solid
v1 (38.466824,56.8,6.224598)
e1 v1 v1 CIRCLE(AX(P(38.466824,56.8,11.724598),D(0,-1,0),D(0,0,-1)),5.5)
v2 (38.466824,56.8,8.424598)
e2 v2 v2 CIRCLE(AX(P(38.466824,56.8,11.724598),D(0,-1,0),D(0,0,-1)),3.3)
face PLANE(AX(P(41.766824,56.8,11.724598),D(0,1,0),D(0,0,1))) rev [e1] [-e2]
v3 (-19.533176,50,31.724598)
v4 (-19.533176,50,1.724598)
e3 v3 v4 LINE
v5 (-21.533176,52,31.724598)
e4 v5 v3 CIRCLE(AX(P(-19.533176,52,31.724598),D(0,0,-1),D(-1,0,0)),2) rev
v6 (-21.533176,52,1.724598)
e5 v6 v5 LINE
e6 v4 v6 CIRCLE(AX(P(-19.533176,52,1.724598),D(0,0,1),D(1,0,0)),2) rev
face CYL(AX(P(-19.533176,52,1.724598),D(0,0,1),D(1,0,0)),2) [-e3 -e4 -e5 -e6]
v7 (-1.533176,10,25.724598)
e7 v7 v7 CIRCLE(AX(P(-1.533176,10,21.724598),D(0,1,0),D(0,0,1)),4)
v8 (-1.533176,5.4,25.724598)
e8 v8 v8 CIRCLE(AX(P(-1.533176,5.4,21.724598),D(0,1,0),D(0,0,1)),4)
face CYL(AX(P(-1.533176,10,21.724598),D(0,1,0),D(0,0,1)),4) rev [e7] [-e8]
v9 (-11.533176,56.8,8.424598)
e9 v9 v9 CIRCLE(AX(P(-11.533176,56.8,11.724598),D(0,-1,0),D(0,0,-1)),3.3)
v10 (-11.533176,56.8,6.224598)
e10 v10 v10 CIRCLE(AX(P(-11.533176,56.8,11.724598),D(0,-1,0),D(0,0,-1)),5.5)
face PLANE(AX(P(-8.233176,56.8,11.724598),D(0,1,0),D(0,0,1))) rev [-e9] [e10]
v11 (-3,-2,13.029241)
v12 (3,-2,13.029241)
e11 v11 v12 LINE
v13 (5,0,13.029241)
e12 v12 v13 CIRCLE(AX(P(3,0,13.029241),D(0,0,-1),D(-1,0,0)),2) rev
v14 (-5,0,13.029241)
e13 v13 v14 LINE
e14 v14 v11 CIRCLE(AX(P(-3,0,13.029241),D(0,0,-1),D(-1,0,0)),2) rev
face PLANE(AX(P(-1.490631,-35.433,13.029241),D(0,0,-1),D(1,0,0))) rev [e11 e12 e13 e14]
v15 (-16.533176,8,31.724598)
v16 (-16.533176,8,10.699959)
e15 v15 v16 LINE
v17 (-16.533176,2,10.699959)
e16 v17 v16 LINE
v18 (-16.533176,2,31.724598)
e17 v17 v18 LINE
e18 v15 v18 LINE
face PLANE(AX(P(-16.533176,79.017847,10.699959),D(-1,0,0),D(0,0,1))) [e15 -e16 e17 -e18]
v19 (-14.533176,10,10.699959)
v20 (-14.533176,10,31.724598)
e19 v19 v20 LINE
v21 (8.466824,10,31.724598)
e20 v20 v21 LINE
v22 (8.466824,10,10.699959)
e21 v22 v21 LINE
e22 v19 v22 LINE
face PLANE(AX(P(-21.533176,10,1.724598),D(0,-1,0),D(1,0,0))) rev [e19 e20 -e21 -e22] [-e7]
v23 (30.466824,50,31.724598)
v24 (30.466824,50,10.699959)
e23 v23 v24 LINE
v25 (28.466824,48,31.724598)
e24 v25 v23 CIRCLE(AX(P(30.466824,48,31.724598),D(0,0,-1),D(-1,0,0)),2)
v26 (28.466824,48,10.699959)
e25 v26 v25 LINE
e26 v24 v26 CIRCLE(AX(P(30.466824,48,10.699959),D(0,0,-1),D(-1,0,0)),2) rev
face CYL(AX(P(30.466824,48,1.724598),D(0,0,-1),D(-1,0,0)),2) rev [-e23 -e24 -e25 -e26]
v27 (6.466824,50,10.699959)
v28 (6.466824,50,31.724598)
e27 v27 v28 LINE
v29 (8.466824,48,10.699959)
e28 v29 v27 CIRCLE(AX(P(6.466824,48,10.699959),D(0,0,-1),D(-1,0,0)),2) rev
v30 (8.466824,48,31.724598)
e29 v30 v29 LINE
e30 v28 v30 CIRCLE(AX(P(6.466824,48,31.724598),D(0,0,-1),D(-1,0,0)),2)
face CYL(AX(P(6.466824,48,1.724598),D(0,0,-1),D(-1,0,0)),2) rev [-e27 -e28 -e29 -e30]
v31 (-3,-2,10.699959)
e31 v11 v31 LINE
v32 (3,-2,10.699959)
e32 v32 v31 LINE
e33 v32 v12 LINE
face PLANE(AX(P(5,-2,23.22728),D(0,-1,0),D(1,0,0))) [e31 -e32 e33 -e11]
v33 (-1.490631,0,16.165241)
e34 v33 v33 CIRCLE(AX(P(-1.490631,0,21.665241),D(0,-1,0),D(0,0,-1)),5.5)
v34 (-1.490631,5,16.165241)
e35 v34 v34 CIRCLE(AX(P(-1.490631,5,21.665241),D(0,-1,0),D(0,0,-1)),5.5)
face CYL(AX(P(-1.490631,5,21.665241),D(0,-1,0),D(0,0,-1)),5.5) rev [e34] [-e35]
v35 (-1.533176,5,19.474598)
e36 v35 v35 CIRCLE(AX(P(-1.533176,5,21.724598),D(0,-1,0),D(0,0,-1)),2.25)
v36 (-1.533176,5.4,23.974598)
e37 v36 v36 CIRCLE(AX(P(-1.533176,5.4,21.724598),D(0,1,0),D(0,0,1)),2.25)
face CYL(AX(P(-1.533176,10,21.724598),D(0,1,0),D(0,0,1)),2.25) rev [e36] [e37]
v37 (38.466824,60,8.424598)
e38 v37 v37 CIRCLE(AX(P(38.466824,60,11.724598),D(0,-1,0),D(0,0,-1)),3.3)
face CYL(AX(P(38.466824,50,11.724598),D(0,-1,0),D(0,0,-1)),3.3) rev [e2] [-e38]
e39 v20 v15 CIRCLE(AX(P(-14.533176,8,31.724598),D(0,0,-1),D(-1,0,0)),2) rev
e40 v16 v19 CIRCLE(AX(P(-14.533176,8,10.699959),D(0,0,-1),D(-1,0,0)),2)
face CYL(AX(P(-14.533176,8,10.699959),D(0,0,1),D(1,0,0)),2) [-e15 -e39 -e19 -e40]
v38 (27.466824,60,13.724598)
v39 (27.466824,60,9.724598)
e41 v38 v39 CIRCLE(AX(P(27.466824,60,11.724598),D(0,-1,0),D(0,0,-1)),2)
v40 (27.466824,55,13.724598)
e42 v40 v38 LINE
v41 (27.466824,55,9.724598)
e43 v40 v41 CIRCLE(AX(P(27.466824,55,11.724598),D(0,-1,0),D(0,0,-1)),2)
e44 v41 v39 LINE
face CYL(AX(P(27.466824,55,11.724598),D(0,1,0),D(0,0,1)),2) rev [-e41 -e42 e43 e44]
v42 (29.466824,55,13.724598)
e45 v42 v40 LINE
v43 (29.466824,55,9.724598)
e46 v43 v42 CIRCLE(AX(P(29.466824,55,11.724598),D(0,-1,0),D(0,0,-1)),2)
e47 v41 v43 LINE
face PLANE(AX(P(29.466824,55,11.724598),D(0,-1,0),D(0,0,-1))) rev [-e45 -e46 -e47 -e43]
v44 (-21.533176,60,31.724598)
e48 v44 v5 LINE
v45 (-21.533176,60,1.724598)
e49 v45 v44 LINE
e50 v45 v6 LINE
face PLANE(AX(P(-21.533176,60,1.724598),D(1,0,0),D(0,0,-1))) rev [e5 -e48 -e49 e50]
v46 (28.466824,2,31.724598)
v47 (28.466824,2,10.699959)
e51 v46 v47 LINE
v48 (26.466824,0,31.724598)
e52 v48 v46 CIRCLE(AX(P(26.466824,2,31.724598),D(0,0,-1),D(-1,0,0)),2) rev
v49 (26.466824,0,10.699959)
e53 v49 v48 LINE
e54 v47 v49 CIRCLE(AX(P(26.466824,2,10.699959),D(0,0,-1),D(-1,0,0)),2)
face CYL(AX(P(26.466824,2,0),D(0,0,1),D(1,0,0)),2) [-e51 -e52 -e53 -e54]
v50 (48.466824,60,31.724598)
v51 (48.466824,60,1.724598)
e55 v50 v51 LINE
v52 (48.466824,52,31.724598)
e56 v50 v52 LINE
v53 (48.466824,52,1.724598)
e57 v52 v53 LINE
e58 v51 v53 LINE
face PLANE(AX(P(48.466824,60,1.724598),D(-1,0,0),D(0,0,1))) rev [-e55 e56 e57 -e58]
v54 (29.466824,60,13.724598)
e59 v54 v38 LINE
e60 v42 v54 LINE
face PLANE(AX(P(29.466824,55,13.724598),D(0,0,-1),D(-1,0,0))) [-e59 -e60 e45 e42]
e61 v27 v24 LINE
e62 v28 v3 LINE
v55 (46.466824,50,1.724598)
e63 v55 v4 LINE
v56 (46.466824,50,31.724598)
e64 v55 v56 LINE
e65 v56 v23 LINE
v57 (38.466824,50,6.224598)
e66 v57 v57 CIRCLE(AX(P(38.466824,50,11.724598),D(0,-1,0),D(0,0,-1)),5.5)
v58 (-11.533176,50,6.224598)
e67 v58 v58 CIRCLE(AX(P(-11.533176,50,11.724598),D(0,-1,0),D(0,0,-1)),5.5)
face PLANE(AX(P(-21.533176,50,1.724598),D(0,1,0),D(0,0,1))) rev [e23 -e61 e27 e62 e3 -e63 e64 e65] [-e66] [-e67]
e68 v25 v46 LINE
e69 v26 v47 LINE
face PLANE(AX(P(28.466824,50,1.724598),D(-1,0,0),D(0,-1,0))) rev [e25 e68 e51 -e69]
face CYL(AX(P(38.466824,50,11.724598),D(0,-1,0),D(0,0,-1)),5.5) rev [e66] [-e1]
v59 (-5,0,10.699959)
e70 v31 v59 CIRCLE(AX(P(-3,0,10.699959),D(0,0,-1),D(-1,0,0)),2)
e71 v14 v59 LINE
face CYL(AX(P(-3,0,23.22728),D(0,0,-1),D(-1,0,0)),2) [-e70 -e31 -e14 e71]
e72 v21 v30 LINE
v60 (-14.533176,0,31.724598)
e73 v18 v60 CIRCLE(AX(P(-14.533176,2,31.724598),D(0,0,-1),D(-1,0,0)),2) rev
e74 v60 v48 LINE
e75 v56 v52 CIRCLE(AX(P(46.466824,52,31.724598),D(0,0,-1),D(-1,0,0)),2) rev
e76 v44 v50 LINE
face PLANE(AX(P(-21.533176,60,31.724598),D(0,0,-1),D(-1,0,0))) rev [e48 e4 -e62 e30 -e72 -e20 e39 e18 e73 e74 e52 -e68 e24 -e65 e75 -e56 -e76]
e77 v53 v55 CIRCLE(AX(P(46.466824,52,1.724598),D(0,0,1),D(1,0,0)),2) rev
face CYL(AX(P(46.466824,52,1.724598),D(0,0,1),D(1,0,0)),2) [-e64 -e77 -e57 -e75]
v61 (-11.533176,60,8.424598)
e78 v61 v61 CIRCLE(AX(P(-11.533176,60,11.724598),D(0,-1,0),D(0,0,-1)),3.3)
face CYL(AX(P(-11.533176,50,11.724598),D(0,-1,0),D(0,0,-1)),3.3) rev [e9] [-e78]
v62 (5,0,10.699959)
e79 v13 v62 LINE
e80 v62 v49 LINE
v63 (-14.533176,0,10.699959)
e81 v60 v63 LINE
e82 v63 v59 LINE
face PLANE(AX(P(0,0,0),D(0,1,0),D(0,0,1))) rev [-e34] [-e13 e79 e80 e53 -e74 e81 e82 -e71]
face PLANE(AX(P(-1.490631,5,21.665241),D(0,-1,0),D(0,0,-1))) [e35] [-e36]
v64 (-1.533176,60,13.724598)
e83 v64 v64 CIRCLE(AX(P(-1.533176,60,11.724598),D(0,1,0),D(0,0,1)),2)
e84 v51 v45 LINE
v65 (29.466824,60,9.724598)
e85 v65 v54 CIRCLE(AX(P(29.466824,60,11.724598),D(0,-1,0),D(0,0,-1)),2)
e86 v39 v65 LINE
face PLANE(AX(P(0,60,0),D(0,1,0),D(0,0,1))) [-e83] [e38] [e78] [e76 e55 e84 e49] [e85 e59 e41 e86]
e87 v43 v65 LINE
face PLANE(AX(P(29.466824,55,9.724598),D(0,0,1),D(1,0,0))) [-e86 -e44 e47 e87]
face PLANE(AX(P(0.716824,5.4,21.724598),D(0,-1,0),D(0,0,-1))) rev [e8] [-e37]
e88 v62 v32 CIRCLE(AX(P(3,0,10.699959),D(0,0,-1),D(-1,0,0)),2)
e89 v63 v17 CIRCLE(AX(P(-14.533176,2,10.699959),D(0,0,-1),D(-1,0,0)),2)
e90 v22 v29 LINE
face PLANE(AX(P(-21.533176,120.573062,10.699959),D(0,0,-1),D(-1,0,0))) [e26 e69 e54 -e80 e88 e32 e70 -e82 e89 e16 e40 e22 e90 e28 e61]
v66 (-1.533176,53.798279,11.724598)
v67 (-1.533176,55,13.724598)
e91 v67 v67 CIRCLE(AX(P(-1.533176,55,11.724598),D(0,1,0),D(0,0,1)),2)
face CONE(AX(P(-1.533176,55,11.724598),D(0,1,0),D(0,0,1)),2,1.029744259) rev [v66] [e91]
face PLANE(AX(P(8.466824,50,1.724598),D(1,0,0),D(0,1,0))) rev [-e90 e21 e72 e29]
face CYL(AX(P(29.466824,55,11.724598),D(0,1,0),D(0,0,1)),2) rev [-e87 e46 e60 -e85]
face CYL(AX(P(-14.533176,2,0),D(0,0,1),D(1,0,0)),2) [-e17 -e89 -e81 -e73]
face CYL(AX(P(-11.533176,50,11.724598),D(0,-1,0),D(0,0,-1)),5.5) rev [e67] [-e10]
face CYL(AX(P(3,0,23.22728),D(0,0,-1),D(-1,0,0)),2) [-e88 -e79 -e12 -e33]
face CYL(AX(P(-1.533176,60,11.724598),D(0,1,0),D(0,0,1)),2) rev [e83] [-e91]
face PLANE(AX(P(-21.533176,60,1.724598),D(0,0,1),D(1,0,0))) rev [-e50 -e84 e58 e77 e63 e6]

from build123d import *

# Parameters (mm, degrees)
SKETCH_8_W                = 70
SKETCH_8_H                = 30
EXTRUDE_3_DEPTH           = 60
SKETCH_9_W                = 30
SKETCH_9_H                = 40
SKETCH_9_W_2              = 20
CUT_EXTRUDE_3_DEPTH       = 83.758884896
OTHER_1_OUTLINE_R         = 5.5
OTHER_1_DEPTH             = 5
HOLE_WIZARD_2_D           = 4.5
HOLE_WIZARD_2_DEPTH       = 10
HOLE_WIZARD_2_CBORE_D     = 8
HOLE_WIZARD_2_CBORE_DEPTH = 4.6
BACK_REACH                = 85.4
SKETCH_16_W               = 70
SKETCH_16_H               = 8.975361008
MM_1_D                    = 4
MM_1_DEPTH                = 5
MM_1_TIP                  = 1.201721238
CUT_EXTRUDE_5_DEPTH       = 5
SKETCH_24_W               = 5
SKETCH_24_H               = 21.024638992
SKETCH_24_W_2             = 20
CUT_EXTRUDE_6_DEPTH       = 10
HOLE_WIZARD_3_D           = 6.6
HOLE_WIZARD_3_DEPTH       = 10
HOLE_WIZARD_3_CBORE_D     = 11
HOLE_WIZARD_3_CBORE_DEPTH = 6.8
FILLET_1_R                = 2
SKETCH_29_W               = 10
SKETCH_29_H               = 2
EXTRUDE_5_DEPTH           = 2.329281552
FILLET_3_R                = 2


# Read off the part's stored shape, not the designer's step: 孔1
with BuildPart() as part:
    # 草图8 → 凸台-拉伸3 (new body)
    with BuildSketch(Plane(origin=(0, 0, 0), x_dir=(1, 0, 0), z_dir=(0, 1, 0))):
        with Locations((13.466824006, -16.724598186)):
            Rectangle(SKETCH_8_W, SKETCH_8_H)
    extrude(amount=EXTRUDE_3_DEPTH)

    # 草图9 → 切除-拉伸3 (cut, through all)
    with BuildSketch(Plane.XY.offset(31.724598186)):
        with Locations((-6.533175994, 30)):
            Rectangle(SKETCH_9_W, SKETCH_9_H)
        with Locations((38.466824006, 30)):
            Rectangle(SKETCH_9_W_2, SKETCH_9_H)
    extrude(amount=-CUT_EXTRUDE_3_DEPTH, mode=Mode.SUBTRACT)

    # 孔1 outline → 孔1 (cut)
    with BuildSketch(Plane(origin=(0, 0, 0), x_dir=(1, 0, 0), z_dir=(0, 1, 0))):
        with Locations((-1.490630647, -21.665240746)):
            Circle(OTHER_1_OUTLINE_R)
    extrude(amount=OTHER_1_DEPTH, mode=Mode.SUBTRACT)

    # 打孔尺寸(%根据)内六角圆柱头螺钉的类型2
    with Locations(Plane(origin=(-1.533175994, 10, 21.724598186), x_dir=(1, 0, 0), z_dir=(0, 1, 0))):
        with Locations((0, 0)):
            CounterBoreHole(HOLE_WIZARD_2_D / 2, HOLE_WIZARD_2_CBORE_D / 2, HOLE_WIZARD_2_CBORE_DEPTH, depth=HOLE_WIZARD_2_DEPTH)

    # back: up to this face of the body (flat: up to its plane)
    back_end = Plane(part.part.faces().sort_by_distance((-6.533175994, 50, 16.724598186))[0])
    # 草图16 → back (cut, up to the picked face)
    with BuildSketch(Plane(origin=(0, 0, 0), x_dir=(1, 0, 0), z_dir=(0, 1, 0)), mode=Mode.PRIVATE) as back_sk1:
        with Locations((13.466824006, -6.21227869)):
            Rectangle(SKETCH_16_W, SKETCH_16_H)
    back_tool1 = split(extrude(back_sk1.sketch, amount=BACK_REACH, mode=Mode.PRIVATE), bisect_by=back_end, keep=Keep.BOTH, mode=Mode.PRIVATE)
    add(back_tool1.solids().sort_by(Axis((13.466824, 0, 6.212279), (0, 1, 0)))[0], mode=Mode.SUBTRACT)

    # 大小mm 暗销孔1
    with Locations(Plane(origin=(-1.533175994, 60, 11.724598186), x_dir=(0, 0, 1), z_dir=(0, 1, 0))):
        with Locations((0, 0)):
            Hole(MM_1_D / 2, depth=MM_1_DEPTH)
            with Locations((0, 0, -(MM_1_DEPTH + MM_1_TIP / 2))):  # 118° drill point
                Cone(0, MM_1_D / 2, MM_1_TIP, mode=Mode.SUBTRACT)

    # 草图23 → 切除-拉伸5 (cut)
    with BuildSketch(Plane.XZ.offset(-60)):
        with BuildLine():
            Line((29.466824006, 9.724598186), (27.466824006, 9.724598186))
            ThreePointArc((27.466824006, 9.724598186), (25.466824006, 11.724598186), (27.466824006, 13.724598186))
            Line((27.466824006, 13.724598186), (29.466824006, 13.724598186))
            ThreePointArc((29.466824006, 13.724598186), (31.466824006, 11.724598186), (29.466824006, 9.724598186))
        make_face()
    extrude(amount=CUT_EXTRUDE_5_DEPTH, mode=Mode.SUBTRACT)

    # 草图24 → 切除-拉伸6 (cut)
    with BuildSketch(Plane(origin=(0, 0, 0), x_dir=(1, 0, 0), z_dir=(0, 1, 0))):
        with Locations((-19.033175994, -21.21227869)):
            Rectangle(SKETCH_24_W, SKETCH_24_H)
        with Locations((38.466824006, -21.21227869)):
            Rectangle(SKETCH_24_W_2, SKETCH_24_H)
    extrude(amount=CUT_EXTRUDE_6_DEPTH, mode=Mode.SUBTRACT)

    # 打孔尺寸(%根据)内六角圆柱头螺钉的类型3
    with Locations(Plane(origin=(-11.533175994, 50, 11.724598186), x_dir=(0, 0, -1), z_dir=(0, -1, 0))):
        with Locations((0, 0), (0, 50)):
            CounterBoreHole(HOLE_WIZARD_3_D / 2, HOLE_WIZARD_3_CBORE_D / 2, HOLE_WIZARD_3_CBORE_DEPTH, depth=HOLE_WIZARD_3_DEPTH)

    # 圆角1
    fillet_1_edges = [part.edges().sort_by_distance(p)[0] for p in [
        (-16.533175994, 0, 21.21227869),
        (-16.533175994, 10, 21.21227869),
        (28.466824006, 0, 21.21227869),
        (-21.533175994, 50, 16.724598186),
        (48.466824006, 50, 16.724598186),
        (8.466824006, 50, 21.21227869),
        (28.466824006, 50, 21.21227869),
    ]]
    fillet(fillet_1_edges, radius=FILLET_1_R)

    # 草图29 → 凸台-拉伸5 (add)
    with BuildSketch(Plane(origin=(0, 0, 10.699959194), x_dir=(-1, 0, 0), z_dir=(0, 0, -1))):
        with Locations((0, -1)):
            Rectangle(SKETCH_29_W, SKETCH_29_H)
    extrude(amount=-EXTRUDE_5_DEPTH)

    # 圆角3
    fillet_3_edges = [part.edges().sort_by_distance(p)[0] for p in [
        (-5, -2, 11.86459997),
        (5, -2, 11.86459997),
    ]]
    fillet(fillet_3_edges, radius=FILLET_3_R - 0.0001)  # a hair under: the kernel refuses the full size


solid = part.part
